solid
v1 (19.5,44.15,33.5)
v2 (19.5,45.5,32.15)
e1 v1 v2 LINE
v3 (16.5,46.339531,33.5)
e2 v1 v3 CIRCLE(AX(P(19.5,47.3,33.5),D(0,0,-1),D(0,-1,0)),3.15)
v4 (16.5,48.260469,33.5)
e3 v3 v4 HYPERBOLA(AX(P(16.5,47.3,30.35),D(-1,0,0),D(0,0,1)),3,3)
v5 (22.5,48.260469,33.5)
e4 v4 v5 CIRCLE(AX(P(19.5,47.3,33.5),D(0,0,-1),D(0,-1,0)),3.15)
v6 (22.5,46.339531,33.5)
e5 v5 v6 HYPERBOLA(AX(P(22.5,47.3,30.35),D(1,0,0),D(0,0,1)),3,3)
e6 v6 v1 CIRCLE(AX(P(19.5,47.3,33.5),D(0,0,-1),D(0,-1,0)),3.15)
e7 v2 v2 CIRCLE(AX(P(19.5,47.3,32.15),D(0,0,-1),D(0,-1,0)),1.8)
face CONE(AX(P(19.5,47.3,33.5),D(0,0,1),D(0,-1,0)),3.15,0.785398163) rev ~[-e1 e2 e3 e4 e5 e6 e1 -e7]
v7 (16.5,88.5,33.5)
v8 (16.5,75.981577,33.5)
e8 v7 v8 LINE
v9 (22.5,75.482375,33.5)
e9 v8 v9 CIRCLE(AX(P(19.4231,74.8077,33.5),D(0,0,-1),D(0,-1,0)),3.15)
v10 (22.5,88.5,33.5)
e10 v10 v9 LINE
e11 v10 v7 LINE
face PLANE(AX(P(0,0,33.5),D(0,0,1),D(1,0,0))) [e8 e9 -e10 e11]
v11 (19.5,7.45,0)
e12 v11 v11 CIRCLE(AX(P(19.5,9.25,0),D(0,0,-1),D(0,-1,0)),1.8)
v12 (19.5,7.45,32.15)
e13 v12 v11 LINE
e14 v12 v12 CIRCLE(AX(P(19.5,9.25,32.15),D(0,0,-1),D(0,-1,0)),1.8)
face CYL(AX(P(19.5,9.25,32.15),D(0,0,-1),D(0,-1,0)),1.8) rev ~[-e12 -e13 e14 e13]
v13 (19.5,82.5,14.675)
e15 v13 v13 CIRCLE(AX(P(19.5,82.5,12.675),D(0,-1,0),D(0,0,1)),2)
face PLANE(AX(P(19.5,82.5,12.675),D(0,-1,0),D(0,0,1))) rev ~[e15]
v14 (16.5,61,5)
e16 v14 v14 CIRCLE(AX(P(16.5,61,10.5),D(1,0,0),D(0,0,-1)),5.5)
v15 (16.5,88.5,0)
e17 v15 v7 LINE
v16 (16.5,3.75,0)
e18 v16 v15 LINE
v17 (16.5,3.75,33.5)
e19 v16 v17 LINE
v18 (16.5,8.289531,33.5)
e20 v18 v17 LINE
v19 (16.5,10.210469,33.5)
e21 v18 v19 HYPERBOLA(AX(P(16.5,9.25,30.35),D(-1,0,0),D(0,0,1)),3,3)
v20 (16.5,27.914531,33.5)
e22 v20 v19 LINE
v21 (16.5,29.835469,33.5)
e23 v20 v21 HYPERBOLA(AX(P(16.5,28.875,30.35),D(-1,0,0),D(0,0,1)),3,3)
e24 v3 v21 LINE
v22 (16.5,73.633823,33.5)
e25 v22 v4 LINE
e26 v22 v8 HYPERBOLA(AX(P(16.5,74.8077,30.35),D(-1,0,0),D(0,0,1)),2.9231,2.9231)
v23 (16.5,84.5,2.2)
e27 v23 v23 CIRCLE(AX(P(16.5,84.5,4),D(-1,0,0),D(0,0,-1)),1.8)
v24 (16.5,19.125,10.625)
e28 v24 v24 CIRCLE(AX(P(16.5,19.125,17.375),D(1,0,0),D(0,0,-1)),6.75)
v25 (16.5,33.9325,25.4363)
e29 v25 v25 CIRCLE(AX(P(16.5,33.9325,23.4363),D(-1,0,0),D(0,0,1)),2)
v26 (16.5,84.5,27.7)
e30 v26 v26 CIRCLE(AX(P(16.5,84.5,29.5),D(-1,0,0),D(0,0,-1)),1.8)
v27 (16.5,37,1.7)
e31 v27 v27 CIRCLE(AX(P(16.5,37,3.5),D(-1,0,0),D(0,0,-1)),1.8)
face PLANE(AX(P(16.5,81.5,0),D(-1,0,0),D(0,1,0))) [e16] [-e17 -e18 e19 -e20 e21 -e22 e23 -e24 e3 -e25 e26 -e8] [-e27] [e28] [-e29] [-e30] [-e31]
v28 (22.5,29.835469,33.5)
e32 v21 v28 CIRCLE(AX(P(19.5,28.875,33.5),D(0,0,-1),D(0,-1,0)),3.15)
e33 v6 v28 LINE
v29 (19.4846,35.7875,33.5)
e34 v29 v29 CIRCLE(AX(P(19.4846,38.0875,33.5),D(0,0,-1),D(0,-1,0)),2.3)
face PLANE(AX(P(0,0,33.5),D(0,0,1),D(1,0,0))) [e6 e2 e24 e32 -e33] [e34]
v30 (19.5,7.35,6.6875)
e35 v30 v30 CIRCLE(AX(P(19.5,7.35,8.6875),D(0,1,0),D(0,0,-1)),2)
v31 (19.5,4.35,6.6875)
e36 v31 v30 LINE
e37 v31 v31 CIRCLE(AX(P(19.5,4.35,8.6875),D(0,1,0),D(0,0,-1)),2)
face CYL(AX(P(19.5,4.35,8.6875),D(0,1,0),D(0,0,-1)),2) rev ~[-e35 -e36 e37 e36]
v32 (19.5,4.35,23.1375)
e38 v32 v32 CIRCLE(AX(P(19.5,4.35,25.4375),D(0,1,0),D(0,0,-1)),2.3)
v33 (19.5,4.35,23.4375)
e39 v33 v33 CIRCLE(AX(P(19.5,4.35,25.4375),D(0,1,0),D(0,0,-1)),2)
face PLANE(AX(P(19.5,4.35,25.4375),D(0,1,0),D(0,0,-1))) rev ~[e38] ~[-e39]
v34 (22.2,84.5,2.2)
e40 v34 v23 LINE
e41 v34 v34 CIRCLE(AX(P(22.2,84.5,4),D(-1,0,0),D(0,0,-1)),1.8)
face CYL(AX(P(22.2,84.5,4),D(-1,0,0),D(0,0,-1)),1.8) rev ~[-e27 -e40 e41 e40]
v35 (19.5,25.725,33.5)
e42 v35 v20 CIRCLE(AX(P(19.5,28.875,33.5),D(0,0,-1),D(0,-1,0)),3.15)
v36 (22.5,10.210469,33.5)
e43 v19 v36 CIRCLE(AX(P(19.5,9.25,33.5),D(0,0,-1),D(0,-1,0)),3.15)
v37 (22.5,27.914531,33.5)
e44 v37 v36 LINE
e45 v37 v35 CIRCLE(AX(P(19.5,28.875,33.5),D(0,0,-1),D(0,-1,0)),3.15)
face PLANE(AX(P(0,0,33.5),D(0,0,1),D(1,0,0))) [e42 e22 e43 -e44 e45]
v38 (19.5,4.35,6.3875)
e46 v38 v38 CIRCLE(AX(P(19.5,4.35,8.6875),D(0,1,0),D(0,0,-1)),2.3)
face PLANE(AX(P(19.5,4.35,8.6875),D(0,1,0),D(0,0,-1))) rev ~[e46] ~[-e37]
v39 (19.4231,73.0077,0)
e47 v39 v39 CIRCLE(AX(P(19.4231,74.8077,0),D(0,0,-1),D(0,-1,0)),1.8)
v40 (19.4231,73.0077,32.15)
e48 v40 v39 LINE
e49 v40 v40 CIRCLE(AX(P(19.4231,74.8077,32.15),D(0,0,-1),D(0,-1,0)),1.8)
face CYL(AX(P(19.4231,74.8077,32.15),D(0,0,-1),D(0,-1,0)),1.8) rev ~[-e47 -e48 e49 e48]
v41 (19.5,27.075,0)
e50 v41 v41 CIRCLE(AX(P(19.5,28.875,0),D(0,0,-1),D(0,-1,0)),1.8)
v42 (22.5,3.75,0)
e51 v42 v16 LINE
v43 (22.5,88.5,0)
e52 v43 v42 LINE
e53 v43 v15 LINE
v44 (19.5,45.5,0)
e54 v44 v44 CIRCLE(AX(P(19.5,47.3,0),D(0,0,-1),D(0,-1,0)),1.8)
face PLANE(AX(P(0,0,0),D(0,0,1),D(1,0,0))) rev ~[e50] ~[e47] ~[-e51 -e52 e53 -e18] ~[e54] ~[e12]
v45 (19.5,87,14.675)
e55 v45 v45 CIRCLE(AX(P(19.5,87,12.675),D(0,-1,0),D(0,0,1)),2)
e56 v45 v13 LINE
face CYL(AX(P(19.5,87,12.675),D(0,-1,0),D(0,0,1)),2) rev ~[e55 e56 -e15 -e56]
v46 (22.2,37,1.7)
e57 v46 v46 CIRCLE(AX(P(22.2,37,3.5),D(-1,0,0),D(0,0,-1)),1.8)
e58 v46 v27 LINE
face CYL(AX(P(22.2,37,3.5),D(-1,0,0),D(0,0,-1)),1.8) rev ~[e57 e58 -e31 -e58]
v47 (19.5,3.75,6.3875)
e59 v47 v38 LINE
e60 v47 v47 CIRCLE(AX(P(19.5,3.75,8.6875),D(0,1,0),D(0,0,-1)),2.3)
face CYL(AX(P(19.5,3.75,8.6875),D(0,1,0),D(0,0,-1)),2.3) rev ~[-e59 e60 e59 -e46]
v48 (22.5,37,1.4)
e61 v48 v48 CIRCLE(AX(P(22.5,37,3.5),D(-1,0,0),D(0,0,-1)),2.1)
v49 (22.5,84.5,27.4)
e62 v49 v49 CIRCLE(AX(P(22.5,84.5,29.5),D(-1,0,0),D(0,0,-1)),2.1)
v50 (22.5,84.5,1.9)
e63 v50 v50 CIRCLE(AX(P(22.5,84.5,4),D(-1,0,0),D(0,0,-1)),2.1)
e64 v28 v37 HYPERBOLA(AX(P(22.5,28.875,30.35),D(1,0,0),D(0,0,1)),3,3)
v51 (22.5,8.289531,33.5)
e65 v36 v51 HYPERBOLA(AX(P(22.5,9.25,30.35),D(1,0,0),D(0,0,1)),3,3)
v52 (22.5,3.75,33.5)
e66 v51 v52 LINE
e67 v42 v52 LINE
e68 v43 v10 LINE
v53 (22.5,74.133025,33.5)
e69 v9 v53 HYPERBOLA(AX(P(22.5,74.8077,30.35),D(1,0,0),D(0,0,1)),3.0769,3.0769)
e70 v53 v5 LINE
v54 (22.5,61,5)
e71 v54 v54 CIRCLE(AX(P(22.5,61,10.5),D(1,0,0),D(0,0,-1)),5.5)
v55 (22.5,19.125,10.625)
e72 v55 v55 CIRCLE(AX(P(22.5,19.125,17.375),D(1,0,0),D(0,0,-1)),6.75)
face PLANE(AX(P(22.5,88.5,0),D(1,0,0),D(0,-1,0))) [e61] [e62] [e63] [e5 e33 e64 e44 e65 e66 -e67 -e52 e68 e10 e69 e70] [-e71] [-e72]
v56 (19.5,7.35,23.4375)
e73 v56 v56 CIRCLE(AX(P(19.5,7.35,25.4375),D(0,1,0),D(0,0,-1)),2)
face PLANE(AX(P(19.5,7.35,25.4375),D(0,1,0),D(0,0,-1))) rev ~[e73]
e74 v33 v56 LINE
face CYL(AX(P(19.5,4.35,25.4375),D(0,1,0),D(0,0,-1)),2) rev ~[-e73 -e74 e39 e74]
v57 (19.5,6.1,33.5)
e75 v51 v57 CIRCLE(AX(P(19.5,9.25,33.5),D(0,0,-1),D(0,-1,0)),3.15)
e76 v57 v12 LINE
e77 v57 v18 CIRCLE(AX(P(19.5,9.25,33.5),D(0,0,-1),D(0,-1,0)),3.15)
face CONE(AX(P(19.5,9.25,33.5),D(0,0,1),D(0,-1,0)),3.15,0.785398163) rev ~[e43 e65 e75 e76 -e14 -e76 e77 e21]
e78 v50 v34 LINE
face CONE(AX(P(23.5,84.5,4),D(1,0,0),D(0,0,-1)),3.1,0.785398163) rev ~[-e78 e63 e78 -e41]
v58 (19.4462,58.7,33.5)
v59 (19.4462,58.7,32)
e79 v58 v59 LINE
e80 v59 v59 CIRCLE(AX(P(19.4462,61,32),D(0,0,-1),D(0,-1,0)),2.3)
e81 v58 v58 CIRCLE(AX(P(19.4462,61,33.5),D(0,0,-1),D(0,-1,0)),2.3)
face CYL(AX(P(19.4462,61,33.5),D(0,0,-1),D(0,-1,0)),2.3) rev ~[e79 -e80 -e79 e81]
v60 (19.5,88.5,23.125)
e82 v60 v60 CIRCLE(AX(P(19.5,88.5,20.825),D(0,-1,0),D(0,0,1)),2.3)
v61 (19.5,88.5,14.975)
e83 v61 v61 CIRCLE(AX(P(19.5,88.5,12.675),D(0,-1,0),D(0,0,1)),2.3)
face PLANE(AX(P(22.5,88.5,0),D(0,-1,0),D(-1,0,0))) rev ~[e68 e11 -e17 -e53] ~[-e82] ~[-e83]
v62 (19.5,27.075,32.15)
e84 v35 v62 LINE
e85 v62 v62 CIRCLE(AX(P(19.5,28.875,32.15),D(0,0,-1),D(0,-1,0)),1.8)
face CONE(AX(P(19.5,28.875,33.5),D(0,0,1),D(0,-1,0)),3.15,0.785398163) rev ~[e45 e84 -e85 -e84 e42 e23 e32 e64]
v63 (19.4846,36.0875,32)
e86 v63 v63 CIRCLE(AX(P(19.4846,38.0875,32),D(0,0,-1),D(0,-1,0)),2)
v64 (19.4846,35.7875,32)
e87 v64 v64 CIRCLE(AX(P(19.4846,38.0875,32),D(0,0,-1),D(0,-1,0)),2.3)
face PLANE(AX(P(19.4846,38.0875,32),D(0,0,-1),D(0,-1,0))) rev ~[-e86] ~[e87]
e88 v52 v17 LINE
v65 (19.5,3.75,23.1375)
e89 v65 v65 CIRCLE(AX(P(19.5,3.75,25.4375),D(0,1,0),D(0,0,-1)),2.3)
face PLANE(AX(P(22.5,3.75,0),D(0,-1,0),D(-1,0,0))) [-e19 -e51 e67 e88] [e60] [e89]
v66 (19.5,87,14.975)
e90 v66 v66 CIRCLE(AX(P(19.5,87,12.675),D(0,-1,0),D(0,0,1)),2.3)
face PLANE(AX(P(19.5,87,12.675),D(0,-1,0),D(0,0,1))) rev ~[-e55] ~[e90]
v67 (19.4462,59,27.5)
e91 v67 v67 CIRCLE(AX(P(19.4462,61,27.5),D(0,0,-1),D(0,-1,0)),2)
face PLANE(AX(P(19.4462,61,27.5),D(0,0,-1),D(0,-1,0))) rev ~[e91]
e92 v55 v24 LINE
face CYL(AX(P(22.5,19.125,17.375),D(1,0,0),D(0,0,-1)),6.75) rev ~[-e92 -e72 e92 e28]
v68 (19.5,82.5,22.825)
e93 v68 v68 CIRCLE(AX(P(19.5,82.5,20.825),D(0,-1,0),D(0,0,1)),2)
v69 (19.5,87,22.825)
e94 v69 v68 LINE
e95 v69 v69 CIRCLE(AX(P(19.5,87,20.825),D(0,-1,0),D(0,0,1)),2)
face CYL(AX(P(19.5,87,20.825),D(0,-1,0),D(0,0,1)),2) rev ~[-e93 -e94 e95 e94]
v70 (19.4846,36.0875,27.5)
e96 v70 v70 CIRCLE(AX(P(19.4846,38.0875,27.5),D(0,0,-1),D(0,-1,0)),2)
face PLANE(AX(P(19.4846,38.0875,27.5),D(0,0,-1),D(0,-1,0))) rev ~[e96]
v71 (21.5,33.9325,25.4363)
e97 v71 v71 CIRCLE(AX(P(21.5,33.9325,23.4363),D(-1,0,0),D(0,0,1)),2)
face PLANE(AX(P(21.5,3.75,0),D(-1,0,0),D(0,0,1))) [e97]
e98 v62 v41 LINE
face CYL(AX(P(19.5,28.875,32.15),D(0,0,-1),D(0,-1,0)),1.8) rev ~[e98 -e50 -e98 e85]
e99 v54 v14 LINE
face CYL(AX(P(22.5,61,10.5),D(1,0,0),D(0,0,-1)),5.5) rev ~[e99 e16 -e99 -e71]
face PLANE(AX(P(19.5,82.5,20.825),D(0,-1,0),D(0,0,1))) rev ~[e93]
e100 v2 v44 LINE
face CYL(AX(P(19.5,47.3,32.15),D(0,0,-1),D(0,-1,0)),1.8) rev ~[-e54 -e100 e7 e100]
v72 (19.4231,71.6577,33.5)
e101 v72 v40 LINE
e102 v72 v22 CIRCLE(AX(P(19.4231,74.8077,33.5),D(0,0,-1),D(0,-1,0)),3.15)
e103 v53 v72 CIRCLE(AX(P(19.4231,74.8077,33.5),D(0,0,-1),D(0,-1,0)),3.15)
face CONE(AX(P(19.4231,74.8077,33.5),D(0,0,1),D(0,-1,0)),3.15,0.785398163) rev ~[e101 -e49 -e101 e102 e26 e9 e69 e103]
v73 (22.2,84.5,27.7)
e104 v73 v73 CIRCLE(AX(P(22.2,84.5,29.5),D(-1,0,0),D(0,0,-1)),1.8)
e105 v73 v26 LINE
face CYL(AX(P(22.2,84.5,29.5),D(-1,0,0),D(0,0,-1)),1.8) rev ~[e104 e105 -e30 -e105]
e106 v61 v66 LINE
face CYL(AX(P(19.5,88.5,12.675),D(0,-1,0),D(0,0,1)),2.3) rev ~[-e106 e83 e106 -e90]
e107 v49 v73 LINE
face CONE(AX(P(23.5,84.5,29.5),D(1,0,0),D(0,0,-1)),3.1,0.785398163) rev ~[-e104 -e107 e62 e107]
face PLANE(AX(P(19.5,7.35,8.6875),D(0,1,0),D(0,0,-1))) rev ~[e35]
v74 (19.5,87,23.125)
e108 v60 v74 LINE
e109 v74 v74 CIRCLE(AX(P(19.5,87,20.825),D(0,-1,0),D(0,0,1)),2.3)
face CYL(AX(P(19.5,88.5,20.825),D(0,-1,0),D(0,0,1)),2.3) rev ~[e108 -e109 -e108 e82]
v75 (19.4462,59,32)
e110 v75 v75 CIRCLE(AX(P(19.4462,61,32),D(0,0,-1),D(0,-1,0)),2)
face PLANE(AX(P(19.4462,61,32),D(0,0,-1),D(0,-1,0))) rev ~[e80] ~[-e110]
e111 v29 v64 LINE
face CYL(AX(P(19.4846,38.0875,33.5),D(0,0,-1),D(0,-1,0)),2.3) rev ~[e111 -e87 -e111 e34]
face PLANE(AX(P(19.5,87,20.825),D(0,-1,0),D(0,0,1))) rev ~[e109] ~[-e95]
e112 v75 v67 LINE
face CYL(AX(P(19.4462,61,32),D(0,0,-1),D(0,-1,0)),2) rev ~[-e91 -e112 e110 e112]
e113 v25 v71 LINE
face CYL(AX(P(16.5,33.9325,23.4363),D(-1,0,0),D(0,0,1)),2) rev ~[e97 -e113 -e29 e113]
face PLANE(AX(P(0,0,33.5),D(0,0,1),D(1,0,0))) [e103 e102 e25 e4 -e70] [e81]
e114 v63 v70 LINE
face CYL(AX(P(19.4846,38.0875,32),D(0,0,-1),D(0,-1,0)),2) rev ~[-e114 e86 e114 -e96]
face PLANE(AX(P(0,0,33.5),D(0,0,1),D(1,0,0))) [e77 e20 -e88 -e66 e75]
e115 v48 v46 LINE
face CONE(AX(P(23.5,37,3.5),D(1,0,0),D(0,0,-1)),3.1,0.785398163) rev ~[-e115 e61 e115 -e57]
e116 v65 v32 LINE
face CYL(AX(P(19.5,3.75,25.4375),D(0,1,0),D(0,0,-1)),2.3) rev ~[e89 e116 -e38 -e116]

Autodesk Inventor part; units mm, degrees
ref_plane "YZ Plane" through (0, 0, 0) normal (1, 0, 0) x (0, 1, 0)
ref_plane "XZ Plane" through (0, 0, 0) normal (0, 1, 0) x (-1, 0, 0)
ref_plane "Work Plane1" through (0, 0, 0) normal (0, 0, 1) x (1, 0, 0)
sketch "Sketch1" plane through (0, 0, 0) normal (0, 0, 1) x (1, 0, 0)
  line L0 (23.5, 88.5) -> (-23.5, 88.5) projected
  line L1 (-23.5, 88.5) -> (-23.5, 36.5) projected
  line L2 (-26.5, 33.5) -> (-89, 33.5) projected
  line L3 (-89, 33.5) -> (-89, -72.5) projected
  line L4 (-89, -72.5) -> (-77, -72.5) projected
  line L5 (-74, -75.5) -> (-74, -93.5) projected
  line L6 (-74, -93.5) -> (74, -93.5) projected
  line L7 (74, -93.5) -> (74, -75.5) projected
  line L8 (77, -72.5) -> (89, -72.5) projected
  line L9 (89, -72.5) -> (89, 33.5) projected
  line L10 (89, 33.5) -> (26.5, 33.5) projected
  line L11 (23.5, 36.5) -> (23.5, 88.5) projected
  line L12 (-4.5, 81.5) -> (-4.5, 36.5) projected
  line L13 (-7.5, 33.5) -> (-13.5, 33.5) projected
  line L14 (-16.5, 36.5) -> (-16.5, 81.5) projected
  line L15 (-13.5, 84.5) -> (-7.5, 84.5) projected
  line L16 (16.5, 81.5) -> (16.5, 36.5) projected
  line L17 (13.5, 33.5) -> (7.5, 33.5) projected
  line L18 (4.5, 36.5) -> (4.5, 81.5) projected
  line L19 (7.5, 84.5) -> (13.5, 84.5) projected
  line L20 (16.5, 88.5) -> (22.5, 88.5)
  line L21 (22.5, 88.5) -> (22.5, 3.75)
  line L22 (22.5, 3.75) -> (16.5, 3.75)
  line L23 (16.5, 3.75) -> (16.5, 88.5)
  line L24 (59.9, 4.75) -> (32.2, 4.75)
  arc A0 (13.5, 33.5) -> (16.5, 36.5) centre (13.5, 36.5) ccw projected
  arc A1 (4.5, 36.5) -> (7.5, 33.5) centre (7.5, 36.5) ccw projected
  arc A2 (7.5, 84.5) -> (4.5, 81.5) centre (7.5, 81.5) ccw projected
  arc A3 (16.5, 81.5) -> (13.5, 84.5) centre (13.5, 81.5) ccw projected
  arc A4 (-4.5, 81.5) -> (-7.5, 84.5) centre (-7.5, 81.5) ccw projected
  arc A5 (-7.5, 33.5) -> (-4.5, 36.5) centre (-7.5, 36.5) ccw projected
  arc A6 (-16.5, 36.5) -> (-13.5, 33.5) centre (-13.5, 36.5) ccw projected
  arc A7 (-13.5, 84.5) -> (-16.5, 81.5) centre (-13.5, 81.5) ccw projected
  arc A8 (-26.5, 33.5) -> (-23.5, 36.5) centre (-26.5, 36.5) ccw projected
  arc A9 (-74, -75.5) -> (-77, -72.5) centre (-77, -75.5) ccw projected
  arc A10 (77, -72.5) -> (74, -75.5) centre (77, -75.5) ccw projected
  arc A11 (23.5, 36.5) -> (26.5, 33.5) centre (26.5, 36.5) ccw projected
  point P0 (0, 0)
  dimension "d0" = 1
  dimension "d1" = 1
ref_plane "Work Plane2" through (-89, -40.3889, 33.5) normal (0, 0, 1) x (1, 0, 0)
extrude "Extrusion1" add sketch "Sketch1" along normal up to surface (33.5 mm away) contours L21 L22 L23 L16 L0
sketch "Sketch2" plane through (22.5, 3.75, 0) normal (1, 0, 0) x (0, 0, -1)
  circle A0 centre (-17.375, 15.375) radius 6.75 projected
  circle A1 centre (-10.5, 57.25) radius 5.5 projected
  point P0 (0, -3.75)
  dimension "d8" = 11
extrude "Extrusion2" cut sketch "Sketch2" against normal up to next
sketch "Sketch3" plane through (16.5, 3.75, 0) normal (-1, 0, 0) x (0, 0, 1)
  circle A0 centre (23.4363, 30.1825) radius 2 projected
  point P0 (0, -3.75)
extrude "Extrusion3" cut sketch "Sketch3" against normal blind 5
ref_plane "Work Plane3" through (23.5, 3.75, 0) normal (1, 0, 0) x (0, 0, -1)
sketch "Sketch4" plane through (23.5, 3.75, 0) normal (1, 0, 0) x (0, 0, -1)
  circle A0 centre (-29.5, 80.75) radius 1.8 projected
  circle A1 centre (-3.5, 33.25) radius 1.8 projected
  circle A2 centre (-4, 80.75) radius 1.8 projected
  point P0 (0, -3.75)
hole "Hole1" at (23.5, 37, 3.5) at (23.5, 84.5, 4) at (23.5, 84.5, 29.5) direction (-1, 0, 0) diameter 3.6 end through all countersink diameter 6.2 countersink angle 90 clearance for "Countersunk Flat Head Screw ISO 2009/7046" size "M3" standard "ISO"
sketch "Sketch5" plane through (16.5, 3.75, 33.5) normal (0, 0, 1) x (1, 0, 0)
  circle A0 centre (-36, 5.5) radius 1.8 projected
  circle A1 centre (-36, 25.125) radius 1.8 projected
  circle A2 centre (-36, 43.55) radius 1.8 projected
  circle A3 centre (-35.9231, 71.0577) radius 1.8 projected
  circle A4 centre (-16.5, 44.3) radius 3.3 projected
  circle A5 centre (-16.5, 15.375) radius 3.3 projected
  circle A6 centre (-16.5, 69.95) radius 3.3 projected
  line L0 (-12, 0) -> (-21, 0) projected
  line L1 (-12, 84.75) -> (-12, 0) projected
  line L2 (-21, 84.75) -> (-12, 84.75) projected
  line L3 (-21, 0) -> (-21, 84.75) projected
  line L4 (-16.5, 0) -> (-16.5, 84.75)
  circle A7 centre (3, 5.5) radius 1.8
  circle A8 centre (3, 25.125) radius 1.8
  circle A9 centre (3, 43.55) radius 1.8
  circle A10 centre (2.9231, 71.0577) radius 1.8
  circle A11 centre (-16.5, 29.7161) radius 2.3 projected
  circle A12 centre (-16.5, 57.25) radius 2.3 projected
  point P0 (-16.5, -3.75)
hole "Hole2" at (19.5, 9.25, 33.5) at (19.5, 28.875, 33.5) at (19.5, 47.3, 33.5) at (19.4231, 74.8077, 33.5) direction (0, 0, -1) diameter 3.6 end through all countersink diameter 6.3 countersink angle 90 clearance for "Countersunk Flat Head Screw ISO 2009/7046" size "M3" standard "ISO"
sketch "Sketch6" plane through (16.5, 3.75, 0) normal (0, -1, 0) x (1, 0, 0)
  line L0 (6, 33.5) -> (0, 33.5) projected
  line L1 (0, 0) -> (0, 33.5) projected
  line L2 (0, 0) -> (6, 0) projected
  line L3 (6, 0) -> (6, 33.5) projected
  line L4 (0, 10.625) -> (0, 24.125) projected
  line L5 (0, 17.375) -> (6, 17.375)
  line L6 (6, 16) -> (6, 5) projected
  line L7 (0, 33.5) -> (6, 17.375)
  line L8 (0, 0) -> (0, 33.5) projected
  line L9 (0, 0) -> (6, 17.375)
  line L10 (6, 0) -> (0, 17.375)
  line L11 (0, 17.375) -> (6, 33.5)
  point P0 (-16.5, 0)
  point P1 (3, 25.4375)
  point P2 (3, 8.6875)
hole "Hole3" at (19.5, 3.75, 25.4375) at (19.5, 3.75, 8.6875) direction (0, 1, 0) diameter 4 depth 3.6 counterbore diameter 4.6 counterbore depth 0.6
sketch "Sketch7" plane through (16.5, 88.5, 0) normal (0, 1, 0) x (1, 0, 0)
  line L0 (0, -33.5) -> (6, -33.5) projected
  line L1 (6, 0) -> (6, -33.5) projected
  line L2 (6, 0) -> (0, 0) projected
  line L3 (0, 0) -> (0, -33.5) projected
  circle A0 centre (-16.5, -12.675) radius 2 projected
  circle A1 centre (-16.5, -20.825) radius 2 projected
  line L4 (-16.5, -20.825) -> (6, -20.825)
  line L5 (-16.5, -12.675) -> (6, -12.675)
  line L6 (6, -5) -> (6, -16) projected
  point P0 (-16.5, 0)
  point P1 (3, -20.825)
  point P2 (3, -12.675)
hole "Hole4" at (19.5, 88.5, 20.825) at (19.5, 88.5, 12.675) direction (0, -1, 0) diameter 4 depth 6 counterbore diameter 4.6 counterbore depth 1.5
sketch "Sketch8" plane through (19.5, 47.3, 33.5) normal (0, 0, 1) x (1, 0, 0)
  circle A0 centre (-39, -9.2125) radius 2.3 projected
  circle A1 centre (-39, 13.7) radius 2.3 projected
  arc A2 (3, 0.9605) -> (-3, 0.9605) centre (0, 0) ccw projected
  line L0 (3, 26.8331) -> (3, 0.9605) projected
  arc A3 (-3, 26.3338) -> (3, 26.8331) centre (-0.0769, 27.5077) ccw projected
  line L1 (-3, 0.9605) -> (-3, 26.3338) projected
  arc A4 (-3, -0.9605) -> (3, -0.9605) centre (0, 0) ccw projected
  line L2 (-3, -17.4645) -> (-3, -0.9605) projected
  arc A5 (3, -17.4645) -> (-3, -17.4645) centre (0, -18.425) ccw projected
  line L3 (3, -0.9605) -> (3, -17.4645) projected
  line L4 (-39, 13.7) -> (3, 13.7)
  line L5 (3, 19.2) -> (3, 8.2) projected
  line L6 (-39, -9.2125) -> (3, -9.2125)
  circle A6 centre (0, -18.425) radius 1.8 projected
  line L7 (0, -18.425) -> (-0.0769, 27.5077)
  point P0 (-19.5, -47.3)
  point P1 (-0.0538, 13.7)
  point P2 (-0.0154, -9.2125)
hole "Hole5" at (19.4462, 61, 33.5) at (19.4846, 38.0875, 33.5) direction (0, 0, -1) diameter 4 depth 6 counterbore diameter 4.6 counterbore depth 1.5
properties part number "left_gear_holder"
